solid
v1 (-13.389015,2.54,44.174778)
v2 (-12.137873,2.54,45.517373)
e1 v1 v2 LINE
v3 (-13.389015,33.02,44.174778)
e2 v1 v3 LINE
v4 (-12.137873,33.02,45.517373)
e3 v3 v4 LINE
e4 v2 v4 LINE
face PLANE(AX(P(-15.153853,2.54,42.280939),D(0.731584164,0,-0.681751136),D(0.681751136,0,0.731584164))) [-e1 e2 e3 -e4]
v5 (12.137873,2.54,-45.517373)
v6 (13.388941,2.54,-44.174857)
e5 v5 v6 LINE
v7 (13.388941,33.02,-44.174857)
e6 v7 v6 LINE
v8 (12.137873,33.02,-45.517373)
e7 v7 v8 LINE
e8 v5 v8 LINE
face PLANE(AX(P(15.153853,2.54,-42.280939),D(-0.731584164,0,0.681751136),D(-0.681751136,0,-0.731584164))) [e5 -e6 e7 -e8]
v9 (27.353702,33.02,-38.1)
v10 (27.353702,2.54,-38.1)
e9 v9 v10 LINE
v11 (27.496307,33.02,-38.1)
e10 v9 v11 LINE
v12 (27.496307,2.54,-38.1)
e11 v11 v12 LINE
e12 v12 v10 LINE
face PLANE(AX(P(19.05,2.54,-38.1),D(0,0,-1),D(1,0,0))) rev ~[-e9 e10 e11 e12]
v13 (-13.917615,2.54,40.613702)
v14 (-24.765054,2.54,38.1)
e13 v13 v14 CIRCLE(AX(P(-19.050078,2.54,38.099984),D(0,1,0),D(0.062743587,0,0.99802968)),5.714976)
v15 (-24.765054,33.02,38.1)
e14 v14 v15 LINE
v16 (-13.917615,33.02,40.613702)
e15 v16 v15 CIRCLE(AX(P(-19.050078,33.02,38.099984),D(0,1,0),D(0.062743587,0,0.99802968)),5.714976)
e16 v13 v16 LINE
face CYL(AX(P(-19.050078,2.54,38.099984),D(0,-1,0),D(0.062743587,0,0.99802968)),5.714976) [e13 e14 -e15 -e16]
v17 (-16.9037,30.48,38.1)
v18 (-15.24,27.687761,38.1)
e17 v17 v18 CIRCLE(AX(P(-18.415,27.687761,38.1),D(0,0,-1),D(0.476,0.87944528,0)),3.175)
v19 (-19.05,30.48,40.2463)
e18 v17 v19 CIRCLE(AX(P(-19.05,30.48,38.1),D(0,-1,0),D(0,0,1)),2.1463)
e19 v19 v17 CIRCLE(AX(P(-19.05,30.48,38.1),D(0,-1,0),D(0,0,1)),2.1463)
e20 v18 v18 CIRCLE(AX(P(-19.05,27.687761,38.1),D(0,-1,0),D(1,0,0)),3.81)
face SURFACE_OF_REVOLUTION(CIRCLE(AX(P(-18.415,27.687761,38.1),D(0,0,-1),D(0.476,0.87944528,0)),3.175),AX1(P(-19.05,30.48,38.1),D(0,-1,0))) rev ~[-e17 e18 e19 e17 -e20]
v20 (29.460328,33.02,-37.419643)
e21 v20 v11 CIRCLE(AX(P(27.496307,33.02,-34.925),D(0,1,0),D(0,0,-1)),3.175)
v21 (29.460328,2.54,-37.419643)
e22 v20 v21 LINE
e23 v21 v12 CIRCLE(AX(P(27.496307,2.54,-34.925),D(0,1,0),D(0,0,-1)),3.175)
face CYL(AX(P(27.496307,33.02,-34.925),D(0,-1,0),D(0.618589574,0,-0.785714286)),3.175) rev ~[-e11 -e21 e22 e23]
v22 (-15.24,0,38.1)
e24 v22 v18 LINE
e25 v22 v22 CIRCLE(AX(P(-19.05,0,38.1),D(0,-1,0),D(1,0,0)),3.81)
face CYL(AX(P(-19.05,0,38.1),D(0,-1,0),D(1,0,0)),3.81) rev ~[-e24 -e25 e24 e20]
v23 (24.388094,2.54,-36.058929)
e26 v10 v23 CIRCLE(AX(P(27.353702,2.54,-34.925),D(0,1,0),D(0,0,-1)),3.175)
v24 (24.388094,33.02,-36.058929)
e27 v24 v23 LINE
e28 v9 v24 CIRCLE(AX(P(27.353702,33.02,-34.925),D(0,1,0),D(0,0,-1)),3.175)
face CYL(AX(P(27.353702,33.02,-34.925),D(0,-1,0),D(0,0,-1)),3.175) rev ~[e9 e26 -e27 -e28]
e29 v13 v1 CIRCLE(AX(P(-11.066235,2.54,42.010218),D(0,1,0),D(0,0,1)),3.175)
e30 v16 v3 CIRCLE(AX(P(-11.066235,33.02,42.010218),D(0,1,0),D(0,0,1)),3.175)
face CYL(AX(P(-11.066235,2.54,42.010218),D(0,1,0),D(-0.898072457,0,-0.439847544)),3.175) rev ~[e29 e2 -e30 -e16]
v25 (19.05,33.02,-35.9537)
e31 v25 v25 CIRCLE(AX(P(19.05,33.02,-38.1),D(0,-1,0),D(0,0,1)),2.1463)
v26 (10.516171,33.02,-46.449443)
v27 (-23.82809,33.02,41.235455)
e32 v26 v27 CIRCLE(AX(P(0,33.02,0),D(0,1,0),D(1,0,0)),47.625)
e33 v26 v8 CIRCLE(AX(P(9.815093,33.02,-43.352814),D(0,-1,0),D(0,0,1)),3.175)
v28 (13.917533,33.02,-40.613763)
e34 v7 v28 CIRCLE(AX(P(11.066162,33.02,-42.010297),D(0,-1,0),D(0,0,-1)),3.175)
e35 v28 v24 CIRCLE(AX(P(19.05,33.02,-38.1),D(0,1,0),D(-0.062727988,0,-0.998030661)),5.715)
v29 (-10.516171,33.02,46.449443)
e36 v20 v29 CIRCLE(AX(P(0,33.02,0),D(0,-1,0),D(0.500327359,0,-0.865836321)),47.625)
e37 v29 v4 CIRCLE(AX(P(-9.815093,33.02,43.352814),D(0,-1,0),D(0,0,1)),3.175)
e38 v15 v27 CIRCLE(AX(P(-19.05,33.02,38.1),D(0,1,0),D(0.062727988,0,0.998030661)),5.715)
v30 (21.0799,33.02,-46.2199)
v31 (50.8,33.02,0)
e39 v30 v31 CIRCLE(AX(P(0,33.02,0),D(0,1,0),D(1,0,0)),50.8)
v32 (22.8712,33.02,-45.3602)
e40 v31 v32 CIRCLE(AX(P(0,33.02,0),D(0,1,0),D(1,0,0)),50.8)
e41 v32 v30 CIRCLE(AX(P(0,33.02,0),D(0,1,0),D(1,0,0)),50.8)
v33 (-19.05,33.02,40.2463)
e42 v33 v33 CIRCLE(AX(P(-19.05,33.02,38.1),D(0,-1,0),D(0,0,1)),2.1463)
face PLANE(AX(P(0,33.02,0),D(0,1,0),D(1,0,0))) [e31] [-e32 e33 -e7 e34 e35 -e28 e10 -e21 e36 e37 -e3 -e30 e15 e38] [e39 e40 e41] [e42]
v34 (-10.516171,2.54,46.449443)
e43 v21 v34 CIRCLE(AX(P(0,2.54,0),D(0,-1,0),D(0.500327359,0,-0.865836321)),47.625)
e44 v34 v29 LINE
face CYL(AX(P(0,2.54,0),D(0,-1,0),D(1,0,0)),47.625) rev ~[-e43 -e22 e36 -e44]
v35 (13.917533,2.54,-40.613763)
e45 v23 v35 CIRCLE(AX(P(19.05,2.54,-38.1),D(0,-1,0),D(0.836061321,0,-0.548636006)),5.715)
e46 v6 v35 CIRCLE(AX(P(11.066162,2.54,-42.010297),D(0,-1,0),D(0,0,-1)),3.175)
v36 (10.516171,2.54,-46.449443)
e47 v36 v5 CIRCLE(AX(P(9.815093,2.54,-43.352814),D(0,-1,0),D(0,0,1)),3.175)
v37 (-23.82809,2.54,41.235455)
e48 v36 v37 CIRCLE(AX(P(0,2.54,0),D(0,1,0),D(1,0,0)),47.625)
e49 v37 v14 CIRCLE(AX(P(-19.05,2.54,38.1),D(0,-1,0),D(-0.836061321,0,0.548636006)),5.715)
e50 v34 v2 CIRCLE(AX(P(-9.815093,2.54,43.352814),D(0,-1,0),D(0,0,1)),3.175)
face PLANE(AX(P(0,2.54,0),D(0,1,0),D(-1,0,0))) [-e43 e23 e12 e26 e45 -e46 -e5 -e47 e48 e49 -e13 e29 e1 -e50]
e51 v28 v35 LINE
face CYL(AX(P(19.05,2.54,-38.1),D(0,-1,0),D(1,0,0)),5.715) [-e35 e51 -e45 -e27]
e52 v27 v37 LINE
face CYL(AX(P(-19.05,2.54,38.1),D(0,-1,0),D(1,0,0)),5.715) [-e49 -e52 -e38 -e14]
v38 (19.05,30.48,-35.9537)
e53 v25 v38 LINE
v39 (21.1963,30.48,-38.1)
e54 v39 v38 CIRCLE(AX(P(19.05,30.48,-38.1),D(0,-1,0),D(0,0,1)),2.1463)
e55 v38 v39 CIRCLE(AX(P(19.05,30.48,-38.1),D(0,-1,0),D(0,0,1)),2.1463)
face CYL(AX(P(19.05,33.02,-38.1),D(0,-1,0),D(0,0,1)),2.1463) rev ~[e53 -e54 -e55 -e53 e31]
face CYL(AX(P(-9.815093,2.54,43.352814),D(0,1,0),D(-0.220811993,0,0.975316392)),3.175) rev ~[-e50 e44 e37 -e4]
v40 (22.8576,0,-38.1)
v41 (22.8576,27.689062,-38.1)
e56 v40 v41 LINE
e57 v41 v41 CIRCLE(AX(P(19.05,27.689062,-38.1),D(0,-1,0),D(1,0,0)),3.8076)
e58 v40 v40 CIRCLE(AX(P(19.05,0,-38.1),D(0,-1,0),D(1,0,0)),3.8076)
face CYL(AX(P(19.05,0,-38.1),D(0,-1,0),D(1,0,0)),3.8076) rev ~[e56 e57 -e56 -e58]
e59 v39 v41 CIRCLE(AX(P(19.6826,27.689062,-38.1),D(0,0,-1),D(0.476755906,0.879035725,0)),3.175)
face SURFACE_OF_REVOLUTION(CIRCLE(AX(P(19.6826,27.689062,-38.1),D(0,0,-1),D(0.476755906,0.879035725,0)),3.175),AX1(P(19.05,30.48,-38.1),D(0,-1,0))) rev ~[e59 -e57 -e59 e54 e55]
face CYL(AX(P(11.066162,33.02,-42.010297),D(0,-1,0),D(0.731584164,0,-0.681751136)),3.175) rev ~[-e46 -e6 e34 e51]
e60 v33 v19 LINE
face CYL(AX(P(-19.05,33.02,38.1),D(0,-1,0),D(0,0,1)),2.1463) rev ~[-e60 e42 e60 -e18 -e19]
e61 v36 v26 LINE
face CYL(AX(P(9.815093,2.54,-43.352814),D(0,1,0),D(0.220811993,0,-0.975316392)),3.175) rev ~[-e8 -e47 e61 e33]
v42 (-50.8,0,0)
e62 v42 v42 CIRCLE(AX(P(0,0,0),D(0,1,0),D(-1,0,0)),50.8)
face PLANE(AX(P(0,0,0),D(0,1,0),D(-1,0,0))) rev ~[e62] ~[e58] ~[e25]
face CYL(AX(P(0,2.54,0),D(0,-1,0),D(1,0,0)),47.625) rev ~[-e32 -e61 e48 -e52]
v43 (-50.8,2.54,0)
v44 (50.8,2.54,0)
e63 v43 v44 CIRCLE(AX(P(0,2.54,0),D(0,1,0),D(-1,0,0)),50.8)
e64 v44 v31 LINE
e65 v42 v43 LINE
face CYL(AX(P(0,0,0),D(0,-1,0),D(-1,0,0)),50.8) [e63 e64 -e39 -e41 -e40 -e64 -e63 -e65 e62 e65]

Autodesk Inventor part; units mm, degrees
ref_plane "YZ Plane" through (0, 0, 0) normal (1, 0, 0) x (0, 1, 0)
ref_plane "XZ Plane" through (0, 0, 0) normal (0, 1, 0) x (-1, 0, 0)
ref_plane "XY Plane" through (0, 0, 0) normal (0, 0, 1) x (1, 0, 0)
sketch "Sketch1" plane through (0, 0, 0) normal (0, 1, 0) x (-1, 0, 0)
  circle A0 centre (0, 0) radius 50.8
  dimension "d0" = 101.6
extrude "Extrusion1" add sketch "Sketch1" along normal blind 2.54
sketch "Sketch2" plane through (0, 2.54, 0) normal (0, 1, 0) x (1, 0, 0)
  circle A0 centre (0, 0) radius 47.625
  circle A1 centre (0, 0) radius 50.8
  dimension "d3" = 95.25
  dimension "d4" = 101.6
extrude "Extrusion2" add sketch "Sketch2" along normal blind 30.48
sketch "Sketch3" plane through (0, 2.54, 0) normal (0, 1, 0) x (1, 0, 0)
  line L0 (0, 0) -> (0, 38.1)
  line L1 (0, 0) -> (0, -38.1)
  line L2 (0, -38.1) -> (-19.05, -38.1)
  line L3 (0, 38.1) -> (19.05, 38.1)
  circle A0 centre (19.05, 38.1) radius 5.715
  circle A1 centre (-19.05, -38.1) radius 5.715
  dimension "d9" = 38.1
  dimension "d10" = 19.05
  dimension "d11" = 11.43
  dimension "d12" = 11.43
extrude "Extrusion3" add sketch "Sketch3" along normal blind 30.48
sketch "Sketch4" plane through (0, 2.54, 0) normal (0, 1, 0) x (1, 0, 0)
  arc A0 (18.6915, 43.8037) -> (23.8281, 41.2355) centre (19.05, 38.1) ccw projected
  line L0 (19.05, 38.1) -> (11.4832, 46.2199)
  arc A1 (-18.6915, -43.8037) -> (23.8281, 41.2355) centre (0, 0) ccw projected
  line L1 (19.05, 38.1) -> (29.6369, 38.1)
  line L2 (29.6369, 38.1) -> (22.8712, 45.3602)
  circle A2 centre (0, 0) radius 50.8 projected
  arc A3 (-18.6915, -43.8037) -> (-23.8281, -41.2355) centre (-19.05, -38.1) ccw projected
  line L3 (-19.05, -38.1) -> (-28.575, -38.1)
  line L4 (-19.05, -38.1) -> (-11.4832, -46.2199)
  line L5 (-21.0799, -46.2199) -> (-28.575, -38.1)
  line L6 (11.4832, 46.2199) -> (21.0799, 46.2199)
  line L7 (21.0799, 46.2199) -> (22.8712, 45.3602)
  line L8 (-11.4832, -46.2199) -> (-21.0799, -46.2199)
  line L9 (-21.0799, -46.2199) -> (-28.575, -38.1)
  point P0 (-15.1538, -42.281)
  point P1 (-24.765, -38.1)
extrude "Extrusion4" add sketch "Sketch4" along normal blind 30.48 contours L0 L6 L7 L2 L1 A1 A0 | A0 A1 L1 | A1 A3 L4 | L4 L3 A3
fillet "Fillet1" radius 3.175 6 edges at (24.765, 17.78, -38.1) (28.575, 17.78, -38.1) (11.4832, 17.78, -46.2199) (15.1538, 17.78, -42.281) (-11.4832, 17.78, 46.2199) (-15.1538, 17.78, 42.281)
sketch "Sketch5" plane through (0, 33.02, 0) normal (0, 1, 0) x (1, 0, 0)
  arc A0 (13.9175, 40.6138) -> (24.3881, 36.0589) centre (19.05, 38.1) ccw projected
  line L0 (19.05, 32.385) -> (19.05, 38.1)
  arc A1 (-13.9175, -40.6138) -> (-23.8281, -41.2355) centre (-19.05, -38.1) ccw projected
  line L1 (-19.05, -32.385) -> (-19.05, -38.1)
  point P0 (0, 0)
  point P1 (-22.4437, -36.3682)
hole "Hole1" at (19.05, 33.02, -38.1) at (-19.05, 33.02, 38.1) direction (0, -1, 0) diameter 4.2926 end through all clearance for "Socket Head Cap Screw" size "M4" standard "Ansi Metric M Profile"
sketch "Sketch6" plane through (0, 0, 0) normal (0, -1, 0) x (1, 0, 0)
  point P0 (0, 0)
sketch "Sketch7" plane through (0, 0, 0) normal (0, -1, 0) x (1, 0, 0)
  circle A0 centre (19.05, -38.1) radius 2.1463 projected
  circle A1 centre (19.05, -38.1) radius 3.8076
  circle A2 centre (-19.05, 38.1) radius 2.1463 projected
  circle A3 centre (-19.05, 38.1) radius 3.81
  point P0 (0, 0)
  dimension "d25" = 7.62
extrude "Extrusion5" cut sketch "Sketch7" against normal blind 30.48 contours A0 | A1 | A2 | A3
fillet "Fillet2" radius 3.175 1 edges at (15.2424, 30.48, -38.1)
fillet "Fillet3" radius 3.175 1 edges at (-22.86, 30.48, 38.1)
properties part number "C0-0-01-ODriveCover"
